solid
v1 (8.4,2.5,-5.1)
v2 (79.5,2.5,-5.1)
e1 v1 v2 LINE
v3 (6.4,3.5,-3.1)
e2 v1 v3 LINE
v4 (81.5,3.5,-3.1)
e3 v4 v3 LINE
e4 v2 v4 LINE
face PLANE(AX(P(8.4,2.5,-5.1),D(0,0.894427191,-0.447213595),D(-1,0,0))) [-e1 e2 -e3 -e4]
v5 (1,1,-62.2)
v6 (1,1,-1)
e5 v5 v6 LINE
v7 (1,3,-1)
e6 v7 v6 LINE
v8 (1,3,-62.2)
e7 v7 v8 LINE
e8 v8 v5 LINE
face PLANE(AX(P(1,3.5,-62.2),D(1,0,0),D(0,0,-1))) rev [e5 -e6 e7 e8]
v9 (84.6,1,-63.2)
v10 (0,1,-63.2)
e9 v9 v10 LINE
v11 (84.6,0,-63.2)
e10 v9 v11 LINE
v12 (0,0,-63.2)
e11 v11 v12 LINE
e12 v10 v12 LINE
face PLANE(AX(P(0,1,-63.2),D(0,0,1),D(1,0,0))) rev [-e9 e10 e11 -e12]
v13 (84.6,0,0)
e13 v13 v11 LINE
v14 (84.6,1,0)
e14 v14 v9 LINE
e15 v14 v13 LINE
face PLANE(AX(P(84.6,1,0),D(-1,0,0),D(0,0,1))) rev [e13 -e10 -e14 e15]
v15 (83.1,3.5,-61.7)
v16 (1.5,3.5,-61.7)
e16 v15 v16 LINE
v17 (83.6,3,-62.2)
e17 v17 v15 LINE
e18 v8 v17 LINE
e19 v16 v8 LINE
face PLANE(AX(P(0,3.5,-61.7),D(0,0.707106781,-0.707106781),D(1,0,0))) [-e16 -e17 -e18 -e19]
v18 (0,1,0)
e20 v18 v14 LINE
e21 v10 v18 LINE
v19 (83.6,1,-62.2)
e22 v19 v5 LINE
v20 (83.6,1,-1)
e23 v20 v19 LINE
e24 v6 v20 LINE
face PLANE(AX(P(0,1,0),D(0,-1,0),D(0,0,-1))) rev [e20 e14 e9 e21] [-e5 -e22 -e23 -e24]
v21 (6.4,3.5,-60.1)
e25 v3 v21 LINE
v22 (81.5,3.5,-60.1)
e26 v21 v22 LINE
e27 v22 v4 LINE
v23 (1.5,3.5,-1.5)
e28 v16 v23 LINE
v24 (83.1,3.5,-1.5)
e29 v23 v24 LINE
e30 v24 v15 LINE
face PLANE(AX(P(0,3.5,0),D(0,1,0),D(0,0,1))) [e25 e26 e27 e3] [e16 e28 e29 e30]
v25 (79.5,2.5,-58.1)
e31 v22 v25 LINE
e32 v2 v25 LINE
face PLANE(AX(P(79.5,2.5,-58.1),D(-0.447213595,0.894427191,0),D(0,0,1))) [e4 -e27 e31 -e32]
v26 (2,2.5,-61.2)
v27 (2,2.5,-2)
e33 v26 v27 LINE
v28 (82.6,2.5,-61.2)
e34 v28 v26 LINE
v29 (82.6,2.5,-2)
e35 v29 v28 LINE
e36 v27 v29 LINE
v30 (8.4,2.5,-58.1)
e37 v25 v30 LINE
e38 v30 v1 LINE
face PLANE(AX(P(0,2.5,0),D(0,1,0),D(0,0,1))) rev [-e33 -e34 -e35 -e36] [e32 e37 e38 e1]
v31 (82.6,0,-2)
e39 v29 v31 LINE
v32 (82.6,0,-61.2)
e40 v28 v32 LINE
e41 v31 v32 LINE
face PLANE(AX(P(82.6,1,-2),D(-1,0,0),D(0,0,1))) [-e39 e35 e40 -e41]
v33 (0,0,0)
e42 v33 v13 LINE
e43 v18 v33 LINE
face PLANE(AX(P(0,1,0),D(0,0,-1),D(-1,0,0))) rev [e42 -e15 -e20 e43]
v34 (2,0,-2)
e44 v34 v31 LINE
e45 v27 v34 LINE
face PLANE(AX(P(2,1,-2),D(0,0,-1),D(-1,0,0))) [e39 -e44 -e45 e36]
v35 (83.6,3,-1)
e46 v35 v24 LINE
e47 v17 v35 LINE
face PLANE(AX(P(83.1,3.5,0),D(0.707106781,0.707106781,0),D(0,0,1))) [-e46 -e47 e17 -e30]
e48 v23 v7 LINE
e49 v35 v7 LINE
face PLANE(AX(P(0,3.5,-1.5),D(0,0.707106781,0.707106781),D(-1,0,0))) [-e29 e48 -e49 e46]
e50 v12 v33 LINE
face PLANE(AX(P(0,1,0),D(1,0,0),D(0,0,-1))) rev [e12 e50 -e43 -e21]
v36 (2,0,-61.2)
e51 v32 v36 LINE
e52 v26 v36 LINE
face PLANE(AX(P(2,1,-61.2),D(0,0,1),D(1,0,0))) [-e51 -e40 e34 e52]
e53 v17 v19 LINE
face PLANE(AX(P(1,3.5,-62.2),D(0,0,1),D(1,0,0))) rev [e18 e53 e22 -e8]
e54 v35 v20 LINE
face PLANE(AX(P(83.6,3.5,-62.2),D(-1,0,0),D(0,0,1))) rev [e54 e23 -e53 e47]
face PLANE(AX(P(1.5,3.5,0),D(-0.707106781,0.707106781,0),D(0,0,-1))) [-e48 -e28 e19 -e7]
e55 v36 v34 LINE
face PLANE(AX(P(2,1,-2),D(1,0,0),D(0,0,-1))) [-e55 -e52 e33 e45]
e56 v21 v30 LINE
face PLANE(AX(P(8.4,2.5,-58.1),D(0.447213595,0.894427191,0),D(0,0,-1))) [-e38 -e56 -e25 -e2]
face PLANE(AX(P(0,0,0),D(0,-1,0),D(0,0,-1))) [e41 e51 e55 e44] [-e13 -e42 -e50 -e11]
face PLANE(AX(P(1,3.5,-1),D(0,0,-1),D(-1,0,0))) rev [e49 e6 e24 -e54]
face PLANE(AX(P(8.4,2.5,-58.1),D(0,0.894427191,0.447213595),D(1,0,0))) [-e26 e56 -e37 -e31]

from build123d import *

# Parameters (mm, degrees)
SKETCH1_W           = 84.6
SKETCH1_H           = 63.2
SKETCH1_W_2         = 80.6
SKETCH1_H_2         = 59.2
BOSS_EXTRUDE1_DEPTH = 1
SKETCH2_W           = 82.6
SKETCH2_H           = 61.2
SKETCH2_W_2         = 80.6
SKETCH2_H_2         = 59.2
BOSS_EXTRUDE2_DEPTH = 2.5
SKETCH3_W           = 82.6
SKETCH3_H           = 61.2
SKETCH3_W_2         = 71.1
SKETCH3_H_2         = 53
BOSS_EXTRUDE3_DEPTH = 1
CHAMFER1_SIZE       = 2
CHAMFER1_SIZE_2     = 1
CHAMFER2_SIZE       = 0.5


with BuildPart() as part:
    # Sketch1 → Boss-Extrude1 (new body)
    with BuildSketch(Plane(origin=(0, 0, 0), x_dir=(1, 0, 0), z_dir=(0, 1, 0))):
        with Locations((42.3, 31.6)):
            Rectangle(SKETCH1_W, SKETCH1_H)
        with Locations((42.3, 31.6)):
            Rectangle(SKETCH1_W_2, SKETCH1_H_2, mode=Mode.SUBTRACT)
    extrude(amount=BOSS_EXTRUDE1_DEPTH)

    # Sketch2 → Boss-Extrude2 (add)
    with BuildSketch(Plane(origin=(0, 1, 0), x_dir=(1, 0, 0), z_dir=(0, 1, 0))):
        with Locations((42.3, 31.6)):
            Rectangle(SKETCH2_W, SKETCH2_H)
        with Locations((42.3, 31.6)):
            Rectangle(SKETCH2_W_2, SKETCH2_H_2, mode=Mode.SUBTRACT)
    extrude(amount=BOSS_EXTRUDE2_DEPTH)

    # Sketch3 → Boss-Extrude3 (add)
    with BuildSketch(Plane(origin=(0, 3.5, 0), x_dir=(1, 0, 0), z_dir=(0, 1, 0))):
        with Locations((42.3, 31.6)):
            Rectangle(SKETCH3_W, SKETCH3_H)
        with Locations((43.95, 31.6)):
            Rectangle(SKETCH3_W_2, SKETCH3_H_2, mode=Mode.SUBTRACT)
    extrude(amount=-BOSS_EXTRUDE3_DEPTH)

    # Chamfer1
    # the kernel refuses this chamfer: 2, 1 mm, written as the material it takes off along each edge
    with BuildSketch(Plane(origin=(79.5, 3.5, -58.1), x_dir=(0.9998508956747119, 0.01726807512366803, 0), z_dir=(0, 0, 1)), Plane(origin=(8.4, 3.5, -5.1), x_dir=(-0.9998508956747119, 0.01726807512366807, 0), z_dir=(0, 0, -1))) as chamfer1_piece_1:
        Polygon((CHAMFER1_SIZE * 0.999850895675, -CHAMFER1_SIZE * 0.0172680751237), (-CHAMFER1_SIZE_2 * 0.0172680751237, -CHAMFER1_SIZE_2 * 0.999850895675), (0, 0), align=None)
    extrude(amount=53, mode=Mode.SUBTRACT)
    with BuildSketch(Plane(origin=(79.5, 3.5, -5.1), x_dir=(0, 0.017268075123668084, 0.9998508956747119), z_dir=(-1, 0, 0)), Plane(origin=(8.4, 3.5, -58.1), x_dir=(0, 0.017268075123668087, -0.9998508956747116), z_dir=(1, 0, 0))) as chamfer1_piece_2:
        Polygon((CHAMFER1_SIZE * 0.999850895675, -CHAMFER1_SIZE * 0.0172680751237), (-CHAMFER1_SIZE_2 * 0.0172680751237, -CHAMFER1_SIZE_2 * 0.999850895675), (0, 0), align=None)
    extrude(amount=71.1, mode=Mode.SUBTRACT)
    with BuildSketch(Plane(origin=(8.4, 3.5, -58.1), x_dir=(0, 0.017268075123668087, -0.9998508956747116), z_dir=(1, 0, 0))) as chamfer1_piece_3a_section:
        Polygon((CHAMFER1_SIZE * 0.999850895675, -CHAMFER1_SIZE * 0.0172680751237), (-CHAMFER1_SIZE_2 * 0.0172680751237, -CHAMFER1_SIZE_2 * 0.999850895675), (0, 0), align=None)
    chamfer1_piece_3a = extrude(amount=76.279657748, mode=Mode.PRIVATE)
    chamfer1_piece_3a = split(chamfer1_piece_3a, bisect_by=Plane(origin=(79.5, 3.182784452, -58.774507016), z_dir=(1, 0, 0)), keep=Keep.TOP, mode=Mode.PRIVATE)
    with BuildSketch(Plane(origin=(79.5, 3.5, -63.279657748), x_dir=(0.9998508956747119, 0.01726807512366803, 0), z_dir=(0, 0, 1))) as chamfer1_piece_3b_section:
        Polygon((CHAMFER1_SIZE * 0.999850895675, -CHAMFER1_SIZE * 0.0172680751237), (-CHAMFER1_SIZE_2 * 0.0172680751237, -CHAMFER1_SIZE_2 * 0.999850895675), (0, 0), align=None)
    chamfer1_piece_3b = extrude(amount=58.179657748, mode=Mode.PRIVATE)
    chamfer1_piece_3b = split(chamfer1_piece_3b, bisect_by=Plane(origin=(80.174507016, 3.182784452, -58.1), z_dir=(0, 0, -1)), keep=Keep.TOP, mode=Mode.PRIVATE)
    chamfer1_piece_3 = chamfer1_piece_3a & chamfer1_piece_3b
    add(chamfer1_piece_3, mode=Mode.SUBTRACT)
    with BuildSketch(Plane(origin=(84.679657748, 3.5, -5.1), x_dir=(0, 0.017268075123668084, 0.9998508956747119), z_dir=(-1, 0, 0))) as chamfer1_piece_4a_section:
        Polygon((CHAMFER1_SIZE * 0.999850895675, -CHAMFER1_SIZE * 0.0172680751237), (-CHAMFER1_SIZE_2 * 0.0172680751237, -CHAMFER1_SIZE_2 * 0.999850895675), (0, 0), align=None)
    chamfer1_piece_4a = extrude(amount=76.279657748, mode=Mode.PRIVATE)
    chamfer1_piece_4a = split(chamfer1_piece_4a, bisect_by=Plane(origin=(79.5, 3.182784452, -4.425492984), z_dir=(1, 0, 0)), keep=Keep.TOP, mode=Mode.PRIVATE)
    with BuildSketch(Plane(origin=(79.5, 3.5, -58.1), x_dir=(0.9998508956747119, 0.01726807512366803, 0), z_dir=(0, 0, 1))) as chamfer1_piece_4b_section:
        Polygon((CHAMFER1_SIZE * 0.999850895675, -CHAMFER1_SIZE * 0.0172680751237), (-CHAMFER1_SIZE_2 * 0.0172680751237, -CHAMFER1_SIZE_2 * 0.999850895675), (0, 0), align=None)
    chamfer1_piece_4b = extrude(amount=58.179657748, mode=Mode.PRIVATE)
    chamfer1_piece_4b = split(chamfer1_piece_4b, bisect_by=Plane(origin=(80.174507016, 3.182784452, -5.1), z_dir=(0, 0, 1)), keep=Keep.TOP, mode=Mode.PRIVATE)
    chamfer1_piece_4 = chamfer1_piece_4a & chamfer1_piece_4b
    add(chamfer1_piece_4, mode=Mode.SUBTRACT)
    with BuildSketch(Plane(origin=(8.4, 3.5, 0.079657748), x_dir=(-0.9998508956747119, 0.017268075123668084, 0), z_dir=(0, 0, -1))) as chamfer1_piece_5a_section:
        Polygon((CHAMFER1_SIZE * 0.999850895675, -CHAMFER1_SIZE * 0.0172680751237), (-CHAMFER1_SIZE_2 * 0.0172680751237, -CHAMFER1_SIZE_2 * 0.999850895675), (0, 0), align=None)
    chamfer1_piece_5a = extrude(amount=58.179657748, mode=Mode.PRIVATE)
    chamfer1_piece_5a = split(chamfer1_piece_5a, bisect_by=Plane(origin=(7.725492984, 3.182784452, -5.1), z_dir=(0, 0, 1)), keep=Keep.TOP, mode=Mode.PRIVATE)
    with BuildSketch(Plane(origin=(79.5, 3.5, -5.1), x_dir=(0, 0.017268075123668084, 0.9998508956747119), z_dir=(-1, 0, 0))) as chamfer1_piece_5b_section:
        Polygon((CHAMFER1_SIZE * 0.999850895675, -CHAMFER1_SIZE * 0.0172680751237), (-CHAMFER1_SIZE_2 * 0.0172680751237, -CHAMFER1_SIZE_2 * 0.999850895675), (0, 0), align=None)
    chamfer1_piece_5b = extrude(amount=76.279657748, mode=Mode.PRIVATE)
    chamfer1_piece_5b = split(chamfer1_piece_5b, bisect_by=Plane(origin=(8.4, 3.182784452, -4.425492984), z_dir=(-1, 0, 0)), keep=Keep.TOP, mode=Mode.PRIVATE)
    chamfer1_piece_5 = chamfer1_piece_5a & chamfer1_piece_5b
    add(chamfer1_piece_5, mode=Mode.SUBTRACT)
    with BuildSketch(Plane(origin=(3.220342252, 3.5, -58.1), x_dir=(0, 0.017268075123668087, -0.9998508956747116), z_dir=(1, 0, 0))) as chamfer1_piece_6a_section:
        Polygon((CHAMFER1_SIZE * 0.999850895675, -CHAMFER1_SIZE * 0.0172680751237), (-CHAMFER1_SIZE_2 * 0.0172680751237, -CHAMFER1_SIZE_2 * 0.999850895675), (0, 0), align=None)
    chamfer1_piece_6a = extrude(amount=76.279657748, mode=Mode.PRIVATE)
    chamfer1_piece_6a = split(chamfer1_piece_6a, bisect_by=Plane(origin=(8.4, 3.182784452, -58.774507016), z_dir=(-1, 0, 0)), keep=Keep.TOP, mode=Mode.PRIVATE)
    with BuildSketch(Plane(origin=(8.4, 3.5, -5.1), x_dir=(-0.9998508956747119, 0.01726807512366807, 0), z_dir=(0, 0, -1))) as chamfer1_piece_6b_section:
        Polygon((CHAMFER1_SIZE * 0.999850895675, -CHAMFER1_SIZE * 0.0172680751237), (-CHAMFER1_SIZE_2 * 0.0172680751237, -CHAMFER1_SIZE_2 * 0.999850895675), (0, 0), align=None)
    chamfer1_piece_6b = extrude(amount=58.179657748, mode=Mode.PRIVATE)
    chamfer1_piece_6b = split(chamfer1_piece_6b, bisect_by=Plane(origin=(7.725492984, 3.182784452, -58.1), z_dir=(0, 0, -1)), keep=Keep.TOP, mode=Mode.PRIVATE)
    chamfer1_piece_6 = chamfer1_piece_6a & chamfer1_piece_6b
    add(chamfer1_piece_6, mode=Mode.SUBTRACT)

    # Chamfer2
    chamfer2_edges = [part.edges().sort_by_distance(p)[0] for p in [
        (1, 3.5, -31.6),
        (42.3, 3.5, -1),
        (83.6, 3.5, -31.6),
        (42.3, 3.5, -62.2),
    ]]
    chamfer(chamfer2_edges, length=CHAMFER2_SIZE)


solid = part.part
